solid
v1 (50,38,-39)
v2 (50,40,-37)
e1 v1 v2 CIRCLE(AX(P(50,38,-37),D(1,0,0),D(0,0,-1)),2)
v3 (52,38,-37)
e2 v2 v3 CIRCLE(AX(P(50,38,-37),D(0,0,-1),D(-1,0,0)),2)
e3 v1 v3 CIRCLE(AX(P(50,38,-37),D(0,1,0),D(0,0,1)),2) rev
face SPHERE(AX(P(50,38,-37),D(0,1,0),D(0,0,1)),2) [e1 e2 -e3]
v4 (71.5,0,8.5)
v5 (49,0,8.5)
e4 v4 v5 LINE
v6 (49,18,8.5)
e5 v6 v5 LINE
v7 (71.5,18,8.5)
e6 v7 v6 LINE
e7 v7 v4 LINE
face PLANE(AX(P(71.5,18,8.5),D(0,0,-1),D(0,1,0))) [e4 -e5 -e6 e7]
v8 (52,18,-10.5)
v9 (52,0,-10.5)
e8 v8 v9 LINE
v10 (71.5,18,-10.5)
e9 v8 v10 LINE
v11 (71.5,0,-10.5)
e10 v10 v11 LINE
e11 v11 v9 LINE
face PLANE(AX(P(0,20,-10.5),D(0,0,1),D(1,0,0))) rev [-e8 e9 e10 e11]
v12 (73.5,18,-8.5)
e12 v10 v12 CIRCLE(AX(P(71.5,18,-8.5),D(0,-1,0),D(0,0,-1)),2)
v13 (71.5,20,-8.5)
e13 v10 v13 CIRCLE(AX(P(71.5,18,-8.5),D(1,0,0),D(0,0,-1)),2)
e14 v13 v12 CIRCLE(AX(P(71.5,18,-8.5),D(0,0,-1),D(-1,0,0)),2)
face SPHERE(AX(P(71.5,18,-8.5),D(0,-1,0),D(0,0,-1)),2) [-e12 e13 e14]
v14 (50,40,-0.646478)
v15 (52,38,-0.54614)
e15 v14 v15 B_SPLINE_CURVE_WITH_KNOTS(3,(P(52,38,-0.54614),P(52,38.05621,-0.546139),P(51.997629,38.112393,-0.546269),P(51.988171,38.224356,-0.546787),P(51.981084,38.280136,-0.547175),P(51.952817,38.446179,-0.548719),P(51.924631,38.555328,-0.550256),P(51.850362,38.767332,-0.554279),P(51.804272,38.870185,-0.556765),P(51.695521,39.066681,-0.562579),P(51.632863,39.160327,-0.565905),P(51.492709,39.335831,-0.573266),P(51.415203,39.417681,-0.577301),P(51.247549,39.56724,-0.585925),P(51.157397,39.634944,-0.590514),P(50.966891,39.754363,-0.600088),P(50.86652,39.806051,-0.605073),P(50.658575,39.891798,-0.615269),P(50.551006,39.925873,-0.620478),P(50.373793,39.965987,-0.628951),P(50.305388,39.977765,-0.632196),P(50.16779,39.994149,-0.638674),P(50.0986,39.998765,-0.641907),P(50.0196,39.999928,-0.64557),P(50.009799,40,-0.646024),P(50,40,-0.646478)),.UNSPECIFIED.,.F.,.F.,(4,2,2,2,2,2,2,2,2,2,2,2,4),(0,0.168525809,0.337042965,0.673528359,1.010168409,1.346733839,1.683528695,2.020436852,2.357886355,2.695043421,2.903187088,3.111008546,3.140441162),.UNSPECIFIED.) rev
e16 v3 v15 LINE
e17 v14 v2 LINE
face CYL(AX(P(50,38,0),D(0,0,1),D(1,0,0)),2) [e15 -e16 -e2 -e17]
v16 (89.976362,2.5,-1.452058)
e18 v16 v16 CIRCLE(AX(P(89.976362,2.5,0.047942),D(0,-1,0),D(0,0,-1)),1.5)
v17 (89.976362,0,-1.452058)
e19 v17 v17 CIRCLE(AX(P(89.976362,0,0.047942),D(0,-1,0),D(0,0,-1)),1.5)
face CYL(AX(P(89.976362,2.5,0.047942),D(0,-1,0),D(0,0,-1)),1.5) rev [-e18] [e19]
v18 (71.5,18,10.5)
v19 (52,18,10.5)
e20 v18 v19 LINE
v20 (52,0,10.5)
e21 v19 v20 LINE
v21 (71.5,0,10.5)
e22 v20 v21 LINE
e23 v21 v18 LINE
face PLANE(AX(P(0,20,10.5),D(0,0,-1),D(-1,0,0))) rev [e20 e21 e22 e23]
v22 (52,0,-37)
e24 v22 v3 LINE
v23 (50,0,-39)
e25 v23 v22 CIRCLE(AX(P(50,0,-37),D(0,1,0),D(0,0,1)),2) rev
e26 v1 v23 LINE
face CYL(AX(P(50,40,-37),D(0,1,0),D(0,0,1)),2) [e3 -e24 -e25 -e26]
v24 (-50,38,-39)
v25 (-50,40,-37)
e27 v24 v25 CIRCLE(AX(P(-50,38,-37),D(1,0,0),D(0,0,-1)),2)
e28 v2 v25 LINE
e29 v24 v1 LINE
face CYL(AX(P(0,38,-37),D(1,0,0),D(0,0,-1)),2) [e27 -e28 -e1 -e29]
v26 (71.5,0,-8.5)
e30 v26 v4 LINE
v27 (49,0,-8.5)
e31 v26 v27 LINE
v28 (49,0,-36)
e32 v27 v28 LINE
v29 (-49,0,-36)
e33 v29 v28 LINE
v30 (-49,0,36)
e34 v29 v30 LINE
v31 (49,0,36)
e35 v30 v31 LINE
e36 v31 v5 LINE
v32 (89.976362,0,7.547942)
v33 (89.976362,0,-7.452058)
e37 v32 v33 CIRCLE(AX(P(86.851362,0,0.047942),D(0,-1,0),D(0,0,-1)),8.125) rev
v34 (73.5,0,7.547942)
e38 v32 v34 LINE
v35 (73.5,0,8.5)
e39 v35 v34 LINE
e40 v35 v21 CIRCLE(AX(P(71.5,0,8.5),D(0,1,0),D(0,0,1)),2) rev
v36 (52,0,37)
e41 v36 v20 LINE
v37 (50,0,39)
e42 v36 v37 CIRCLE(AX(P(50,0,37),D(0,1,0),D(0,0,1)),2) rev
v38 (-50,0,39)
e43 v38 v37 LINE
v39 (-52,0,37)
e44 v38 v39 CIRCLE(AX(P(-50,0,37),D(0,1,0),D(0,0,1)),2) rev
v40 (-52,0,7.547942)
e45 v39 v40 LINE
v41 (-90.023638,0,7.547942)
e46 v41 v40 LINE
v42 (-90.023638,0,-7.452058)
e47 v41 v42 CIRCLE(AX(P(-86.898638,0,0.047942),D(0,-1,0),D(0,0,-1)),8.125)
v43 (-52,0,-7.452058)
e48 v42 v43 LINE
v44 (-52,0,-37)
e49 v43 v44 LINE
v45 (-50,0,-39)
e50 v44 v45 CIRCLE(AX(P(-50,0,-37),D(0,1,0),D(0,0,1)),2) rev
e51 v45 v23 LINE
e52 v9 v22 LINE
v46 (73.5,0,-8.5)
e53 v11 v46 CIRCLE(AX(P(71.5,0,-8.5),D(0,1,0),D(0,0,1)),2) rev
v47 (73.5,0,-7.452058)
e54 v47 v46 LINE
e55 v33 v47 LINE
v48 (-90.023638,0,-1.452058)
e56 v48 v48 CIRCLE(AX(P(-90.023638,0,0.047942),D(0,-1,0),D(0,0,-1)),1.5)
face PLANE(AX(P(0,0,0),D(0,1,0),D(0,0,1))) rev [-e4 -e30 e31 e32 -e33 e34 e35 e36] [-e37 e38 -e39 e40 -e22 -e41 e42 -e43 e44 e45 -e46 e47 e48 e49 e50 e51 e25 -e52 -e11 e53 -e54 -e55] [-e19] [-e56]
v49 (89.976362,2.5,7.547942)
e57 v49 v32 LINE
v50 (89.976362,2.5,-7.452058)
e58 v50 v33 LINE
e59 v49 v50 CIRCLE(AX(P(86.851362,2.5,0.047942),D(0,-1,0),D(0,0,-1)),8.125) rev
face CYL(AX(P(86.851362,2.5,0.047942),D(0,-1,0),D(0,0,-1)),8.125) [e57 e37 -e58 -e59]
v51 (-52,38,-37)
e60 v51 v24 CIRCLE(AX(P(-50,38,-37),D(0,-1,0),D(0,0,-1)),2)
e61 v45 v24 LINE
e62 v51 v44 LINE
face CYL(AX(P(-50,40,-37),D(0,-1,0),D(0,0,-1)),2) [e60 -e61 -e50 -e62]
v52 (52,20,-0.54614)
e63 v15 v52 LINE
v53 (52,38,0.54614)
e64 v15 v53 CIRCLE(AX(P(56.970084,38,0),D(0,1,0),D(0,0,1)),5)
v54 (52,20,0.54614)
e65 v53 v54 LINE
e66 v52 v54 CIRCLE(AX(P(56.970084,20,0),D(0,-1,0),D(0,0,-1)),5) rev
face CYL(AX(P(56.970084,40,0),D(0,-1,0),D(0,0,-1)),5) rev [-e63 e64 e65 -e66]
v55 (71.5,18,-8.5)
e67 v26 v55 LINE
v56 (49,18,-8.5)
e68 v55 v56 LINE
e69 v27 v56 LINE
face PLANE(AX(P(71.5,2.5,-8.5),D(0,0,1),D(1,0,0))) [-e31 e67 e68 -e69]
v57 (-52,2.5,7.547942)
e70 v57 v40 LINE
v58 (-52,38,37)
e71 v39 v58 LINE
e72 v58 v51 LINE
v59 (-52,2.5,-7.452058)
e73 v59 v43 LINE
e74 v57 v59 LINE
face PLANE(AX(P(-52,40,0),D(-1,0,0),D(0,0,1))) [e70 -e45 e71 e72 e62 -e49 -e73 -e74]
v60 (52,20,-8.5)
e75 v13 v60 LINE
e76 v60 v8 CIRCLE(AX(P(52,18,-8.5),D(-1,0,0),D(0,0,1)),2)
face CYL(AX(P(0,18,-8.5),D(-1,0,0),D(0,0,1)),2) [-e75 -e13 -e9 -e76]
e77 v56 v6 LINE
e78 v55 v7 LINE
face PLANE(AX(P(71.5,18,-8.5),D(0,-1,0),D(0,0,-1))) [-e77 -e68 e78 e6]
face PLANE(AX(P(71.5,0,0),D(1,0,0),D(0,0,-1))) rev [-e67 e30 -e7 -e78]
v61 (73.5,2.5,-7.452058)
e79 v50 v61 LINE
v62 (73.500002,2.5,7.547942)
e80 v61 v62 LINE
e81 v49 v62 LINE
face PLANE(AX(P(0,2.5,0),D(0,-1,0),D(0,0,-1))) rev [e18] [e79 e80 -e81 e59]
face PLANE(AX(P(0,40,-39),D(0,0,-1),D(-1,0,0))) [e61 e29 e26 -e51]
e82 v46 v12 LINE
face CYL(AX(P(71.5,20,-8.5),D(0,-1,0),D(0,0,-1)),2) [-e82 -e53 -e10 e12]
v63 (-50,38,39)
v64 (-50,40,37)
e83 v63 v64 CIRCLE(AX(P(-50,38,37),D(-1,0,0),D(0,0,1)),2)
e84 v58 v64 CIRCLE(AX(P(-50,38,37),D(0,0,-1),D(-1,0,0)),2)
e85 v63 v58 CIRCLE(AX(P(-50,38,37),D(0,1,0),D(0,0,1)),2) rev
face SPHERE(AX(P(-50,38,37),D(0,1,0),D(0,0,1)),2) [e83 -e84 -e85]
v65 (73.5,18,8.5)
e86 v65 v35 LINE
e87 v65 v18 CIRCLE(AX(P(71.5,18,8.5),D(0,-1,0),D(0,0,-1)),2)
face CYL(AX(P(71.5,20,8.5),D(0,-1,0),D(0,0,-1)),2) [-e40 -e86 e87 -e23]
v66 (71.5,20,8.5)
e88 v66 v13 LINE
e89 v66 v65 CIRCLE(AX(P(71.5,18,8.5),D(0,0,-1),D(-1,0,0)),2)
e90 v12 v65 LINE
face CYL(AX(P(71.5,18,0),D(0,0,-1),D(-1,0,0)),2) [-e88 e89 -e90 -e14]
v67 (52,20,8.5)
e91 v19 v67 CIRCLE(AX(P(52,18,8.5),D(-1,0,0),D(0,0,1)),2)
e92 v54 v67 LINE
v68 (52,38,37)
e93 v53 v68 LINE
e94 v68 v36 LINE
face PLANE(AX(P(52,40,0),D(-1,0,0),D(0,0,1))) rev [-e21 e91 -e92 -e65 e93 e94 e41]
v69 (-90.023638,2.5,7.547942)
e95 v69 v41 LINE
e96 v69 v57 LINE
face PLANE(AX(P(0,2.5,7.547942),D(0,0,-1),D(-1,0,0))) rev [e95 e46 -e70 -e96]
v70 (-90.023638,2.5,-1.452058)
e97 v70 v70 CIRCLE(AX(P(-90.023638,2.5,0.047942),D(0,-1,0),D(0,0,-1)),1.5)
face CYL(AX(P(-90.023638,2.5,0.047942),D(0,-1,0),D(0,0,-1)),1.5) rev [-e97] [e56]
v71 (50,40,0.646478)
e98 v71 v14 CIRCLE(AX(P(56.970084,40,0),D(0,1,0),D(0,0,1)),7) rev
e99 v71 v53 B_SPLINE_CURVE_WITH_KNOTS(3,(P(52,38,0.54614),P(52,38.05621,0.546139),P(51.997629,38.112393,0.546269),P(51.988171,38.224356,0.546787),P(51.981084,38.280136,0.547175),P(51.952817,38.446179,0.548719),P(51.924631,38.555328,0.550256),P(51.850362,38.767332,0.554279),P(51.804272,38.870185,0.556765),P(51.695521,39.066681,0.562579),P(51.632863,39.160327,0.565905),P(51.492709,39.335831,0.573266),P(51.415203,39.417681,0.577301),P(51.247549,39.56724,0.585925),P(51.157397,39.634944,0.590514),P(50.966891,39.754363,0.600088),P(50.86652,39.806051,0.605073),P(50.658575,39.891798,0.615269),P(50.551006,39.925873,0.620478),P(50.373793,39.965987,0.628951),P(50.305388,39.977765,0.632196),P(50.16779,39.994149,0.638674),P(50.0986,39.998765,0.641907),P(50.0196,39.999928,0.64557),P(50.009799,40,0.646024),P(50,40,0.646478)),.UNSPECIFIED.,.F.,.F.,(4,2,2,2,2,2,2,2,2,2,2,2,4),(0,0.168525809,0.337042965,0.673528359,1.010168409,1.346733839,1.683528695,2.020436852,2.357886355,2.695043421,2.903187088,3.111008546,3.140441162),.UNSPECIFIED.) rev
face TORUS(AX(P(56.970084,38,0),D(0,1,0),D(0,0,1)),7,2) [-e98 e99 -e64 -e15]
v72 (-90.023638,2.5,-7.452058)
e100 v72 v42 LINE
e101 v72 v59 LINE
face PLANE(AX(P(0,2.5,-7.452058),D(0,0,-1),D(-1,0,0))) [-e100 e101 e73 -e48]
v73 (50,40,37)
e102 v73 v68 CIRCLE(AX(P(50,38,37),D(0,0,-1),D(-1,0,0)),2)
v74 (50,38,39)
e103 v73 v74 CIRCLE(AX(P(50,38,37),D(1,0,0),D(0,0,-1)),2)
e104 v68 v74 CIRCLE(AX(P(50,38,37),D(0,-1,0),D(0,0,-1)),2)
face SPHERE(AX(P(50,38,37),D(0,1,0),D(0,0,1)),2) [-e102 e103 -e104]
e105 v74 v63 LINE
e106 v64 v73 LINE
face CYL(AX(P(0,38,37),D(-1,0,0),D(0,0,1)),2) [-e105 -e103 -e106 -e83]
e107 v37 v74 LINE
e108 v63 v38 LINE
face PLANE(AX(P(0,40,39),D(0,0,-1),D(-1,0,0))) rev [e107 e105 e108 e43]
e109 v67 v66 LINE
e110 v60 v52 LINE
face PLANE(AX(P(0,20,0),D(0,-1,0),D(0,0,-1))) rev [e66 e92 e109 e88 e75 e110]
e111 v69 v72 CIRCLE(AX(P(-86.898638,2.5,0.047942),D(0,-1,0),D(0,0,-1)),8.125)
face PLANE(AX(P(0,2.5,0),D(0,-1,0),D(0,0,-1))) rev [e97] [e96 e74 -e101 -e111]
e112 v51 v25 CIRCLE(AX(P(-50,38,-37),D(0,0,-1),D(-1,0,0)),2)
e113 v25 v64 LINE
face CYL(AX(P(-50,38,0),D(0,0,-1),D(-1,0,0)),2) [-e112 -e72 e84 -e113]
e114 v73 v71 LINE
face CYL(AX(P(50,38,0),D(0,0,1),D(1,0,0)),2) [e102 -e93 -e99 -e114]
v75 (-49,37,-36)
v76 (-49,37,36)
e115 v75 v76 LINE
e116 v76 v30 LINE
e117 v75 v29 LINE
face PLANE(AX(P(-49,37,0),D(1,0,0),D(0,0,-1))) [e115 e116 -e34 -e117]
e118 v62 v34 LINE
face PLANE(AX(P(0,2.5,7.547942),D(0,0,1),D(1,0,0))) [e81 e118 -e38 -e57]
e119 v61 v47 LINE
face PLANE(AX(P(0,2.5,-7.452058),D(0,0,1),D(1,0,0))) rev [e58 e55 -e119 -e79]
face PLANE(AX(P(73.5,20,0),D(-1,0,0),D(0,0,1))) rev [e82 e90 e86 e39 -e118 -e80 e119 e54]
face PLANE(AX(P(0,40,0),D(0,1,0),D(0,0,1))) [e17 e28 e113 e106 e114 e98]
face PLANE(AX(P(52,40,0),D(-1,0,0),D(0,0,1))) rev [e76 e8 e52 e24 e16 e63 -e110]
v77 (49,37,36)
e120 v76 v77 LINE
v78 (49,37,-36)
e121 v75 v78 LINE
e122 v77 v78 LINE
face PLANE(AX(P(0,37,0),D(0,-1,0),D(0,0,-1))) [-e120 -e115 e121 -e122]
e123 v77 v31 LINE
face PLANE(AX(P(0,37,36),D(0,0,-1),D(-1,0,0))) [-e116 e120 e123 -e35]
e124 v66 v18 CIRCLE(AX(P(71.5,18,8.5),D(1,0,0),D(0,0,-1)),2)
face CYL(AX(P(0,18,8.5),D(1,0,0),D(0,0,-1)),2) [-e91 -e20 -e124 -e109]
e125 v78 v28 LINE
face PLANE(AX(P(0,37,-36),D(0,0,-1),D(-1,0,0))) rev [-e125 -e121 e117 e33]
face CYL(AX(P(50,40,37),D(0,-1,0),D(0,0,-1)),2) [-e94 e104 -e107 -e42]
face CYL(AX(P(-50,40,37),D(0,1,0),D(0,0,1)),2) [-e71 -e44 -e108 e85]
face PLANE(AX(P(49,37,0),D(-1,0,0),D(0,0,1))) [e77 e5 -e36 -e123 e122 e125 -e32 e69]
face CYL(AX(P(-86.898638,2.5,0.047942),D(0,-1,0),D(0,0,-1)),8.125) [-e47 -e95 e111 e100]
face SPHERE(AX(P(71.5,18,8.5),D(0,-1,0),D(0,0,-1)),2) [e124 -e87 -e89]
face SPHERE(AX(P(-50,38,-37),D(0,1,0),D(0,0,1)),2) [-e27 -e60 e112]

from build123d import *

# Parameters (mm, degrees)
SKETCH1_R           = 1.5
SKETCH1_W           = 3
SKETCH1_H           = 15
BOSS_EXTRUDE1_DEPTH = 40
BOSS_EXTRUDE4_DEPTH = 20
SKETCH3_R           = 1.5
CUT_EXTRUDE1_DEPTH  = 37
SKETCH4_R           = 1.5
BOSS_EXTRUDE5_DEPTH = 2.5
BOSS_EXTRUDE6_DEPTH = 20
SKETCH7_W           = 0.047941902
SKETCH7_H           = 17.5
BOSS_EXTRUDE7_DEPTH = 0.02364
SKETCH9_W           = 17
SKETCH9_H           = 15.5
CUT_EXTRUDE2_DEPTH  = 22.5
CUT_EXTRUDE3_DEPTH  = 13.5
SKETCH13_W          = 17
SKETCH13_H          = 2.5
CUT_EXTRUDE4_DEPTH  = 22.5
FILLET1_R           = 2
FILLET2_R           = 2
FILLET3_R           = 2


with BuildPart() as part:
    # Sketch1 → Boss-Extrude1 (new body)
    # profile 1 of 7: a face of its own
    with BuildSketch(Plane(origin=(0, 0, 0), x_dir=(1, 0, 0), z_dir=(0, 1, 0))):
        Polygon((-49, 7.5), (-49, 36), (49, 36), (49, 7.5), (49, -7.5), (49, -36.000000001), (-49, -36.000000001), (-49, -7.5), align=None)
        with Locations((39, 0)):
            Circle(SKETCH1_R, mode=Mode.SUBTRACT)
        with Locations((-39, 0)):
            Circle(SKETCH1_R, mode=Mode.SUBTRACT)
    # profile 2 of 7: a face of its own
    with BuildSketch(Plane(origin=(0, 0, 0), x_dir=(1, 0, 0), z_dir=(0, 1, 0))):
        Polygon((-52, 10.5), (-52, 7.5), (-49, 7.5), (-49, 36), (49, 36), (49, 7.5), (52, 7.5), (52, 10.5), (52, 39), (-52, 39), align=None)
    # profile 3 of 7: a face of its own
    with BuildSketch(Plane(origin=(0, 0, 0), x_dir=(1, 0, 0), z_dir=(0, 1, 0))):
        with BuildLine():
            Line((49, -7.5), (52, -7.5))
            Line((52, -7.5), (52, -0.546139522))
            ThreePointArc((52, -0.546139522), (51.970083663, 0), (52, 0.546139522))
            Line((52, 0.546139522), (52, 7.5))
            Line((52, 7.5), (49, 7.5))
            Line((49, 7.5), (49, -7.5))
        make_face()
    # profile 4 of 7: a face of its own
    with BuildSketch(Plane(origin=(0, 0, 0), x_dir=(1, 0, 0), z_dir=(0, 1, 0))):
        Polygon((-52, -7.5), (-52, -10.5), (-52, -39.000000001), (52, -39.000000001), (52, -10.5), (52, -7.5), (49, -7.5), (49, -36.000000001), (-49, -36.000000001), (-49, -7.5), align=None)
    # profile 5 of 7: a face of its own
    with BuildSketch(Plane(origin=(0, 0, 0), x_dir=(1, 0, 0), z_dir=(0, 1, 0))):
        with Locations((-50.5, 0)):
            Rectangle(SKETCH1_W, SKETCH1_H)
    # profile 6 of 7: a face of its own
    with BuildSketch(Plane(origin=(0, 0, 0), x_dir=(1, 0, 0), z_dir=(0, 1, 0))):
        with Locations((39, 0)):
            Circle(SKETCH1_R)
    # profile 7 of 7: a face of its own
    with BuildSketch(Plane(origin=(0, 0, 0), x_dir=(1, 0, 0), z_dir=(0, 1, 0))):
        with Locations((-39, 0)):
            Circle(SKETCH1_R)
    extrude(amount=BOSS_EXTRUDE1_DEPTH)

    # Sketch2 → Boss-Extrude4 (add)
    with BuildSketch(Plane.XZ):
        with BuildLine():
            Line((67.466015394, -7.5), (73.5, -7.5))
            Line((73.5, -7.5), (73.5, 7.5))
            Line((73.5, 7.5), (67.466015394, 7.5))
            Line((67.466015394, 7.5), (52, 7.5))
            Line((52, 7.5), (52, 0.546139522))
            ThreePointArc((52, 0.546139522), (57.243562806, 4.992515314), (61.970083663, 0))
            ThreePointArc((61.970083663, 0), (57.243562806, -4.992515313), (52, -0.546139522))
            Line((52, -0.546139522), (52, -7.5))
            Line((52, -7.5), (67.466015394, -7.5))
        make_face()
        Polygon((52, -10.5), (73.5, -10.5), (73.5, -7.5), (67.466015394, -7.5), (52, -7.5), align=None)
        with BuildLine():
            ThreePointArc((52, 0.546139522), (51.970083663, 0), (52, -0.546139522))
            ThreePointArc((52, -0.546139522), (57.243562806, -4.992515313), (61.970083663, 0))
            ThreePointArc((61.970083663, 0), (57.243562806, 4.992515314), (52, 0.546139522))
        make_face()
    extrude(amount=-BOSS_EXTRUDE4_DEPTH)

    # Sketch3 → Cut-Extrude1 (cut)
    # profile 1 of 3: a face of its own
    with BuildSketch(Plane.XZ):
        Polygon((49, 7.5), (49, -7.500000001), (49, -36.000000001), (-49, -36.000000001), (-49, -7.500000001), (-49, 7.5), (-49, 36), (49, 36), align=None)
        with Locations((39, 0)):
            Circle(SKETCH3_R, mode=Mode.SUBTRACT)
        with Locations((-39, 0)):
            Circle(SKETCH3_R, mode=Mode.SUBTRACT)
    # profile 2 of 3: a face of its own
    with BuildSketch(Plane.XZ):
        with Locations((-39, 0)):
            Circle(SKETCH3_R)
    # profile 3 of 3: a face of its own
    with BuildSketch(Plane.XZ):
        with Locations((39, 0)):
            Circle(SKETCH3_R)
    extrude(amount=-CUT_EXTRUDE1_DEPTH, mode=Mode.SUBTRACT)

    # Sketch4 → Boss-Extrude5 (add)
    # profile 1 of 2: a face of its own
    with BuildSketch(Plane.XZ):
        with BuildLine():
            ThreePointArc((-90.023637676, 7.547941902), (-93.659046318, 4.554880996), (-95.023637677, 0.047941901))
            ThreePointArc((-95.023637677, 0.047941901), (-93.659046319, -4.458997193), (-90.023637677, -7.452058099))
            Line((-90.023637677, -7.452058099), (-49.023637677, -7.452058099))
            Line((-49.023637677, -7.452058099), (-49.023637677, 7.547941902))
            Line((-49.023637677, 7.547941902), (-90.023637676, 7.547941902))
        make_face()
        with Locations(Location((-90.023637677, 0.047941901, 0), (0, 0, 270))):
            Circle(SKETCH4_R, mode=Mode.SUBTRACT)
    # profile 2 of 2: a face of its own
    with BuildSketch(Plane.XZ):
        with BuildLine():
            ThreePointArc((89.976362323, -7.452058099), (93.611770964, -4.458997193), (94.976362323, 0.047941901))
            ThreePointArc((94.976362323, 0.047941901), (93.611770964, 4.554880996), (89.976362321, 7.547941902))
            Line((89.976362321, 7.547941902), (73.476362323, 7.547941902))
            Line((73.476362323, 7.547941902), (73.476362323, -7.452058099))
            Line((73.476362323, -7.452058099), (89.976362323, -7.452058099))
        make_face()
        with Locations(Location((89.976362323, 0.047941901, 0), (0, 0, 270))):
            Circle(SKETCH4_R, mode=Mode.SUBTRACT)
    extrude(amount=-BOSS_EXTRUDE5_DEPTH)

    # Sketch6 → Boss-Extrude6 (add)
    with BuildSketch(Plane.XZ):
        Polygon((73.5, 10.5), (52, 10.5), (52, 7.5), (73.476362323, 7.5), (73.476362323, 7.547941902), (73.5, 7.547941902), align=None)
    extrude(amount=-BOSS_EXTRUDE6_DEPTH)

    # Sketch7 → Boss-Extrude7 (add)
    with BuildSketch(Plane(origin=(73.476362323, 0, 0), x_dir=(0, 0, -1), z_dir=(1, 0, 0))):
        with Locations((-7.523970951, 11.25)):
            Rectangle(SKETCH7_W, SKETCH7_H)
    extrude(amount=BOSS_EXTRUDE7_DEPTH)

    # Sketch9 → Cut-Extrude2 (cut)
    with BuildSketch(Plane.ZY.offset(-49)):
        with Locations((0, 10.25)):
            Rectangle(SKETCH9_W, SKETCH9_H)
    extrude(amount=-CUT_EXTRUDE2_DEPTH, mode=Mode.SUBTRACT)

    # Sketch11 → Cut-Extrude3 (cut)
    with BuildSketch(Plane.XZ):
        with BuildLine():
            Line((52, 0.546139523), (52, -0.546139522))
            ThreePointArc((52, -0.546139522), (57.243562806, -4.992515313), (61.970083663, 1e-09))
            ThreePointArc((61.970083663, 1e-09), (57.243562806, 4.992515315), (52, 0.546139523))
        make_face()
    extrude(amount=-CUT_EXTRUDE3_DEPTH, mode=Mode.SUBTRACT)

    # Sketch13 → Cut-Extrude4 (cut)
    with BuildSketch(Plane.ZY.offset(-49)):
        with Locations((0, 1.25)):
            Rectangle(SKETCH13_W, SKETCH13_H)
    extrude(amount=-CUT_EXTRUDE4_DEPTH, mode=Mode.SUBTRACT)

    # Fillet1
    fillet1_edges = [part.edges().sort_by_distance(p)[0] for p in [
        (73.5, 10, 10.5),
        (-52, 20, -39),
        (52, 20, -39),
        (52, 20, 39.000000001),
        (-52, 20, 39.000000001),
        (73.5, 10, -10.5),
    ]]
    fillet(fillet1_edges, radius=FILLET1_R)

    # Fillet2
    fillet2_edges = [part.edges().sort_by_distance(p)[0] for p in [
        (-52, 40, 0),
        (0, 40, -39),
        (0, 40, 39.000000001),
        (52, 40, 18.773069762),
        (51.414213562, 40, 38.414213563),
        (-51.414213562, 40, 38.414213563),
        (51.414213562, 40, -38.414213562),
        (-51.414213562, 40, -38.414213562),
        (51.970083663, 40, 0),
        (52, 40, -18.773069761),
    ]]
    fillet(fillet2_edges, radius=FILLET2_R)

    # Fillet3
    # the kernel refuses this fillet: 2 mm, written as the material it takes off along each edge
    with BuildSketch(Plane(origin=(52, 20, -10.5), x_dir=(0, -1, 0), z_dir=(1, 0, 0)), Plane(origin=(71.5, 20, 10.5), x_dir=(0, -1, 0), z_dir=(-1, 0, 0))) as fillet3_piece_1:
        with BuildLine():
            CenterArc((FILLET3_R, -FILLET3_R), FILLET3_R, 90, 90)
            Line((0, -FILLET3_R), (0, 0))
            Line((0, 0), (FILLET3_R, 0))
        make_face()
    extrude(amount=19.5, mode=Mode.SUBTRACT)
    with BuildSketch(Plane(origin=(71.5, 20, -8.5), x_dir=(1, 0, 0), z_dir=(0, 0, 1))) as fillet3_piece_2:
        with BuildLine():
            CenterArc((2 - FILLET3_R, -FILLET3_R), FILLET3_R, 0, 90)
            Line((2 - FILLET3_R, 0), (2, 0))
            Line((2, 0), (2, -FILLET3_R))
        make_face()
    revolve(axis=Axis((71.5, 20, -8.5), (0, 1, 0)), revolution_arc=90, mode=Mode.SUBTRACT)
    with BuildSketch(Plane(origin=(73.5, 20, 12.5), x_dir=(0, -1, 0), z_dir=(0, 0, -1))) as fillet3_piece_3:
        with BuildLine():
            CenterArc((FILLET3_R, FILLET3_R), FILLET3_R, 180, 90)
            Line((0, FILLET3_R), (0, 0))
            Line((0, 0), (FILLET3_R, 0))
        make_face()
    extrude(amount=21, mode=Mode.SUBTRACT)
    with BuildSketch(Plane(origin=(73.5, 20, 7.547941902), x_dir=(0, -1, 0), z_dir=(1, 0, 0)), Plane(origin=(73.5, 20, 7.5), x_dir=(0, 0, 1), z_dir=(1, 0, 0))) as fillet3_piece_4:
        with BuildLine():
            CenterArc((FILLET3_R, FILLET3_R), FILLET3_R, 180, 90)
            Line((0, FILLET3_R), (0, 0))
            Line((0, 0), (FILLET3_R, 0))
        make_face()
    extrude(amount=5.000002322, mode=Mode.SUBTRACT)
    with BuildSketch(Plane(origin=(73.5, 20, 2.547941902), x_dir=(0, -1, 0), z_dir=(0, 0, 1))) as fillet3_piece_5:
        with BuildLine():
            CenterArc((FILLET3_R, -FILLET3_R), FILLET3_R, 90, 90)
            Line((0, -FILLET3_R), (0, 0))
            Line((0, 0), (FILLET3_R, 0))
        make_face()
    extrude(amount=5.952058098, mode=Mode.SUBTRACT)
    with BuildSketch(Plane(origin=(71.5, 20, 8.5), x_dir=(0, 0, 1), z_dir=(-1, 0, 0))) as fillet3_piece_6:
        with BuildLine():
            CenterArc((2 - FILLET3_R, -FILLET3_R), FILLET3_R, 0, 90)
            Line((2 - FILLET3_R, 0), (2, 0))
            Line((2, 0), (2, -FILLET3_R))
        make_face()
    revolve(axis=Axis((71.5, 20, 8.5), (0, 1, 0)), revolution_arc=90, mode=Mode.SUBTRACT)
    with BuildSketch(Plane(origin=(73.500002323, 20, 12.547941902), x_dir=(-1, 0, 0), z_dir=(0, 0, -1))) as fillet3_piece_7:
        with BuildLine():
            CenterArc((FILLET3_R, -FILLET3_R), FILLET3_R, 90, 90)
            Line((0, -FILLET3_R), (0, 0))
            Line((0, 0), (FILLET3_R, 0))
        make_face()
    extrude(amount=10.047941902, mode=Mode.SUBTRACT)


solid = part.part
